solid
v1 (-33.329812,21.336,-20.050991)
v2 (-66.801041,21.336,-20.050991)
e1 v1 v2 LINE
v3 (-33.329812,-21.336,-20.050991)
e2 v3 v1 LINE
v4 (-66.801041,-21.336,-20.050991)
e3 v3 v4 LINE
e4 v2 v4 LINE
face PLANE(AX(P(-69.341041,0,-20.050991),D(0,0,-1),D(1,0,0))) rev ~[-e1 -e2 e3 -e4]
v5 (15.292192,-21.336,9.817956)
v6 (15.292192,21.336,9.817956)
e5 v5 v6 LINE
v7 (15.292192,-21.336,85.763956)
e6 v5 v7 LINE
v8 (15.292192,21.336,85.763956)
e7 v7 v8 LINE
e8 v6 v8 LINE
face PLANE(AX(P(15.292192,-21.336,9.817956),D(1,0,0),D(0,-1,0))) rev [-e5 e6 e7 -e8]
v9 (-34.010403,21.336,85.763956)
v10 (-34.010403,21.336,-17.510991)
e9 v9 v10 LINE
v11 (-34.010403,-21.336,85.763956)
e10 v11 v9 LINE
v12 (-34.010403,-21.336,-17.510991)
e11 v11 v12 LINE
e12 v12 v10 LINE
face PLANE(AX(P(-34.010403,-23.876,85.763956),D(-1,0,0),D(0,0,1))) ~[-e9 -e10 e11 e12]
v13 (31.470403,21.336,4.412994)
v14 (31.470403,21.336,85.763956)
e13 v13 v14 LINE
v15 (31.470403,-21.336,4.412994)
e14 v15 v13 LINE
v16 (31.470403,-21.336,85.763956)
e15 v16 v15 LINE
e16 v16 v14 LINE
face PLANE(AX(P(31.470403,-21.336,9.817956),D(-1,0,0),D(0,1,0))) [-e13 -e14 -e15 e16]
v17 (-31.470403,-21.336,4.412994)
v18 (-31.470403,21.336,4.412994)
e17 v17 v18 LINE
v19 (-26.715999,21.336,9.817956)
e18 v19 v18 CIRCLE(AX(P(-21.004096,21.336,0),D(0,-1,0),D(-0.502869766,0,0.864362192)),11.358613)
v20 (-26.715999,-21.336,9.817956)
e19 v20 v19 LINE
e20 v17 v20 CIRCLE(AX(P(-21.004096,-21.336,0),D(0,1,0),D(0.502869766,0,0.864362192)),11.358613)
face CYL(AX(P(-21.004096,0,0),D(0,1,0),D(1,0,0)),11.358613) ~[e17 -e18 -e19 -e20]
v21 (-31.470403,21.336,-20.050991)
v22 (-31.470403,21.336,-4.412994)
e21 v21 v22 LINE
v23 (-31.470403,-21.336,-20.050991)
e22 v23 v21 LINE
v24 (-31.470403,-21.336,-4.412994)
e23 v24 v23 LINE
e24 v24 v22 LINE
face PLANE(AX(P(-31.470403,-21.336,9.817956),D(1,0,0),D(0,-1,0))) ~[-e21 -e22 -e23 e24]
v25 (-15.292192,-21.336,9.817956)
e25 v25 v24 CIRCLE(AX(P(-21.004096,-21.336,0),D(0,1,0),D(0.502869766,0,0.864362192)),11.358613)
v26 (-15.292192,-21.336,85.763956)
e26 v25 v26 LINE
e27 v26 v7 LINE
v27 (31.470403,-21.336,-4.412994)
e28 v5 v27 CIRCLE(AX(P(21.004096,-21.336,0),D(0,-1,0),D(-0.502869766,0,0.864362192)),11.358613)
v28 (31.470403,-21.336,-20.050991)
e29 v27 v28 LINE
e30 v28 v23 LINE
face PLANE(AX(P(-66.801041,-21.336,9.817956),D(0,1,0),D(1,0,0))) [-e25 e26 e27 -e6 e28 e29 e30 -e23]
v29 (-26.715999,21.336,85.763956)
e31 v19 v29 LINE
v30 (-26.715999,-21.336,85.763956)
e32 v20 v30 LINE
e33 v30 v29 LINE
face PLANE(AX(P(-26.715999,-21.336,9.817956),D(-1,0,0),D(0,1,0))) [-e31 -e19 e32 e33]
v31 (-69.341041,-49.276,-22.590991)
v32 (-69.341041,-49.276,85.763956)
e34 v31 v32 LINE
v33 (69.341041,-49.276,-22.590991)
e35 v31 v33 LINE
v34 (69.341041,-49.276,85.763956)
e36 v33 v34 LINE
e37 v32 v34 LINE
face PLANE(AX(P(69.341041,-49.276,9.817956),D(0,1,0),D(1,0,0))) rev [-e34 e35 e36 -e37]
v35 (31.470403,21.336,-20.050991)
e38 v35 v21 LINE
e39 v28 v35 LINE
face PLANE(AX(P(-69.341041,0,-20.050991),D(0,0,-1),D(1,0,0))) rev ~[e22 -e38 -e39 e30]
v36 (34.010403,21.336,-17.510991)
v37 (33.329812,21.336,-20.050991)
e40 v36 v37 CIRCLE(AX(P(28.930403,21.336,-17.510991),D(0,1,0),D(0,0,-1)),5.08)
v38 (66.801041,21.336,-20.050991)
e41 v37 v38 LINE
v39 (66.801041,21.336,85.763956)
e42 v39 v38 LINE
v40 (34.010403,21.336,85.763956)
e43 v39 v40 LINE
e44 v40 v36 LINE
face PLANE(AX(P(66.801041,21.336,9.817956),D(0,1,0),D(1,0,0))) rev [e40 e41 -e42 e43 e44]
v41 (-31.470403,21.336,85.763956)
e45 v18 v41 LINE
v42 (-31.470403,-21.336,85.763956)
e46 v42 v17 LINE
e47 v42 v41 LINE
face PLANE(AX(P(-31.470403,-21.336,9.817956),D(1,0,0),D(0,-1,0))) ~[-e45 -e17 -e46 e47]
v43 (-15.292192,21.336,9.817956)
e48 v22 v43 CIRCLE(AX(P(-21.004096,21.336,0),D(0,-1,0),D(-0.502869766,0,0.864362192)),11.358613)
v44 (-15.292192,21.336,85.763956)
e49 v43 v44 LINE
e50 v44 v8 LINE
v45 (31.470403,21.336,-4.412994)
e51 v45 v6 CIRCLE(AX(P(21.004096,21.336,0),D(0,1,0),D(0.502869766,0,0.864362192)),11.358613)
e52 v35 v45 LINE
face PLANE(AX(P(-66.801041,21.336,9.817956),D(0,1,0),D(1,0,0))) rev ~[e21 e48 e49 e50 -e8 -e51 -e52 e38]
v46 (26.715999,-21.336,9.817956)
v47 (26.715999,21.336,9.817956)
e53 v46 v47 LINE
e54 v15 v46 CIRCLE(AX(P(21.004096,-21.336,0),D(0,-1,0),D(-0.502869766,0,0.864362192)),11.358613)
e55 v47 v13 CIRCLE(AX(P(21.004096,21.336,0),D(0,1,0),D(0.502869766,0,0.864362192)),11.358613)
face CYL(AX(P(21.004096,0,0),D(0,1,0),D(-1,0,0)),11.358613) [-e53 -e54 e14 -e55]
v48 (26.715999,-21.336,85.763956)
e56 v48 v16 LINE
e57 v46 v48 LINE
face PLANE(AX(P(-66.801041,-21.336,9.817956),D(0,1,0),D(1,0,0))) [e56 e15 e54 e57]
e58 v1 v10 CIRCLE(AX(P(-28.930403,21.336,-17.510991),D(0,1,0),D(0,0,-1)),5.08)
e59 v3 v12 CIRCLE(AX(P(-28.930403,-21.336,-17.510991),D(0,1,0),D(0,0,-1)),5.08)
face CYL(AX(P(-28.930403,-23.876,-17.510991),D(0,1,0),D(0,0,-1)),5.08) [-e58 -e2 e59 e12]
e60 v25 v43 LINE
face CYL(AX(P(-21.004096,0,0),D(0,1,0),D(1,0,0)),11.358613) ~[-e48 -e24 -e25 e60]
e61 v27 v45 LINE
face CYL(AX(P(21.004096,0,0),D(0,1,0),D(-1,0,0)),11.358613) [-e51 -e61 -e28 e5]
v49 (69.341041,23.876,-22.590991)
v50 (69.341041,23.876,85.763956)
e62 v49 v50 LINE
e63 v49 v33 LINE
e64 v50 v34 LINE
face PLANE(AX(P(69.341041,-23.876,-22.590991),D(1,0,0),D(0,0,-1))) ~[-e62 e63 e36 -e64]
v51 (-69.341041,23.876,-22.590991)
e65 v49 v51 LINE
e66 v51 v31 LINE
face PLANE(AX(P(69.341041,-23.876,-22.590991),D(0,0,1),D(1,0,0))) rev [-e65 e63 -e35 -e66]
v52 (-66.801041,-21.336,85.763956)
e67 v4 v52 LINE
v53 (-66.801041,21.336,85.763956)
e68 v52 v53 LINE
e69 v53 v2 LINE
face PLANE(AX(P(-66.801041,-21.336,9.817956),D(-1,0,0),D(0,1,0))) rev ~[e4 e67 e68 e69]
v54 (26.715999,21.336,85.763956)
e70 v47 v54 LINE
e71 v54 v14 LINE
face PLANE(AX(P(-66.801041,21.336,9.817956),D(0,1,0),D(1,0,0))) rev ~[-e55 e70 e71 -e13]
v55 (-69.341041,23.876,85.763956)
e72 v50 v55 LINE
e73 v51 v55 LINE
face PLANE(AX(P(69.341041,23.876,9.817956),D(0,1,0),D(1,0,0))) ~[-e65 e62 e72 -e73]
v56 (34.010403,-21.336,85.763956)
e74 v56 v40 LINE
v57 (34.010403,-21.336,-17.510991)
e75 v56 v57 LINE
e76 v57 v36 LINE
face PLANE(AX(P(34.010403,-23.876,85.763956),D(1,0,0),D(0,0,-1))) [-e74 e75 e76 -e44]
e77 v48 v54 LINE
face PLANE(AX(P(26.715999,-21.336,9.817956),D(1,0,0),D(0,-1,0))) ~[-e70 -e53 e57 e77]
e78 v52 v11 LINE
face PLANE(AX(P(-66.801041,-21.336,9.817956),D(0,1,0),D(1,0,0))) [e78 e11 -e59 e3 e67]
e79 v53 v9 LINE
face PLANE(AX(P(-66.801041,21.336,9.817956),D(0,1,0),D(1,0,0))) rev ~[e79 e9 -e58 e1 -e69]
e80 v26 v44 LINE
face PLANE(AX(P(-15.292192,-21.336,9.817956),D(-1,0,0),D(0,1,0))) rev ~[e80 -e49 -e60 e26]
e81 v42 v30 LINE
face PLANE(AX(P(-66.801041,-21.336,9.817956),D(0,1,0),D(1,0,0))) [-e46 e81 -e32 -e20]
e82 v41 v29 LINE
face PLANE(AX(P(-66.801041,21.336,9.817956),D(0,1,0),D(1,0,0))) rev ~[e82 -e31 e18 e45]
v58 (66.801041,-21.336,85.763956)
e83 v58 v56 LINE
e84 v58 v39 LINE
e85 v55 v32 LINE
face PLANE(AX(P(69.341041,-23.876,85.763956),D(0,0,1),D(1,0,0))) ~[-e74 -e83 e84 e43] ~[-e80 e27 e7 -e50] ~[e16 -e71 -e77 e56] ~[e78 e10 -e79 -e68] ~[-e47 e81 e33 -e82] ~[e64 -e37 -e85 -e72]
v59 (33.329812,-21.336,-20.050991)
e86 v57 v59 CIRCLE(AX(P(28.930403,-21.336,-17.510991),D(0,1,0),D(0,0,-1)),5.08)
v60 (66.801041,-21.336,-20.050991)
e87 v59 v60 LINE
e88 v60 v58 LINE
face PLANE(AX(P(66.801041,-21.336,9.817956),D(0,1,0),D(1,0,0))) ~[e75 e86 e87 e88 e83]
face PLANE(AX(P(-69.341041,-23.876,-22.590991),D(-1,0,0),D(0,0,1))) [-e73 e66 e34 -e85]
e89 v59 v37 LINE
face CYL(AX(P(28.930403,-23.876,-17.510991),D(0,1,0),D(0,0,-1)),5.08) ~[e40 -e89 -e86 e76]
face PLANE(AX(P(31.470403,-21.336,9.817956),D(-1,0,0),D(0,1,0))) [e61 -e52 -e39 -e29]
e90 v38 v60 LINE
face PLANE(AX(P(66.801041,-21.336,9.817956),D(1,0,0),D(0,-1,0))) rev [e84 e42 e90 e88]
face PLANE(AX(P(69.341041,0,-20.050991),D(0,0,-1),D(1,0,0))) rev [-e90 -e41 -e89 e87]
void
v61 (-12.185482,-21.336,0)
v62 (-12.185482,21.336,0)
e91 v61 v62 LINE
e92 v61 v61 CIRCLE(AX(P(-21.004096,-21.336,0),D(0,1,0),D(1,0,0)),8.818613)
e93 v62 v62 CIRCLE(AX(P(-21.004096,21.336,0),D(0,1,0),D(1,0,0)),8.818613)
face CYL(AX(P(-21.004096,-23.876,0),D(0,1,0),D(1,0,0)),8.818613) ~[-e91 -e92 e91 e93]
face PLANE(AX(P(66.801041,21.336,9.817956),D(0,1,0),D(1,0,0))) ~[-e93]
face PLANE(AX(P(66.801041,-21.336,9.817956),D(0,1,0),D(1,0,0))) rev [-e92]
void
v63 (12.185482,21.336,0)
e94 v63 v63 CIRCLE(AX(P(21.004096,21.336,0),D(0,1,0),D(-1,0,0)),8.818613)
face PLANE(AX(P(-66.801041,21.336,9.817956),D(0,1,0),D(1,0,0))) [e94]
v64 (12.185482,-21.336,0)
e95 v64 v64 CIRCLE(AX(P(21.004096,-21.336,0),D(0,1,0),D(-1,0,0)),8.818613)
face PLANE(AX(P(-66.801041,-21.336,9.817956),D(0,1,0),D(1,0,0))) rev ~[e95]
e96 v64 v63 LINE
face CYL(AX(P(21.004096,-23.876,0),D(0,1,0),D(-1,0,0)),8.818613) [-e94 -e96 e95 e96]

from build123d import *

# Parameters (mm, degrees)
F0_W     = 103.351444006
F0_H     = 32.4089471251
F0_R     = 8.8186134511
F2_DEPTH = 23.876
F3_T     = 2.54
F4_R     = 5.08
F5_DEPTH = 75.946
F6_DEPTH = 25.4


# Not quite as in the source:
# - a shell that OpenCascade refuses in one call is made with other operations: the cavity is built on its own and cut out
# - the program builds the solid bodies; features that only make, move or delete a surface that nothing else refers to are left out


with BuildPart() as f2:
    # F0 (on Front) → F2 (new body, symmetric)
    with BuildSketch(Plane.XZ):
        with Locations((-17.6653191447, -6.3865175471)):
            Rectangle(F0_W, F0_H)
        with Locations((-21.0040956736, 0)):
            Circle(F0_R, mode=Mode.SUBTRACT)
    extrude(amount=F2_DEPTH, both=True)

    # F3: shell of thickness 2.54, made by hand


with BuildPart() as f3_core1:
    # F3_t2: copy of F2
    add(f2.part)

    # the walls: a layer under each face that stays
    f3_faces = [f3_core1.faces().sort_by_distance(p)[0] for p in [
        (34.0104028583, 0, -6.3865175471),
        (-17.6653191447, 0, -22.5909911096),
        (-69.3410411477, 0, -6.3865175471),
        (-52.11580048, -23.876, -17.1894999221),
        (-29.8227091247, 0, 0),
        (-52.11580048, 23.876, -17.1894999221),
    ]]
    thicken(f3_faces, amount=-F3_T, mode=Mode.SUBTRACT)


with BuildPart() as f2_1:
    add(f2.part)

    # what is left inside the walls is the cavity
    f3_cavity = [f3_core1.part.solids().sort_by_distance(p)[0] for p in [
        (-17.665319, 7.112, -20.025591),
    ]]
    add(f3_cavity, mode=Mode.SUBTRACT)

    # F4
    f4_edges = [f2_1.edges().sort_by_distance(p)[0] for p in [
        (34.010403, 0, -22.590991),
    ]]
    fillet(f4_edges, radius=F4_R)

    # F5 (add): a face of the model
    f5_faces = [f2_1.faces().sort_by_distance(p)[0] for p in [
        (-18.9893309888, 0, 9.8179560155),
    ]]
    extrude(f5_faces, amount=F5_DEPTH)

    # F6 (add): a face of the model
    f6_faces = [f2_1.faces().sort_by_distance(p)[0] for p in [
        (-17.6163810634, -23.876, 32.3181446874),
    ]]
    extrude(f6_faces, amount=F6_DEPTH)

    # F7: F2 across plane


with BuildPart() as f2_2:
    add(f2_1.part)
    add(f2_1.part.mirror(Plane.YZ))


solid = f2_2.part
